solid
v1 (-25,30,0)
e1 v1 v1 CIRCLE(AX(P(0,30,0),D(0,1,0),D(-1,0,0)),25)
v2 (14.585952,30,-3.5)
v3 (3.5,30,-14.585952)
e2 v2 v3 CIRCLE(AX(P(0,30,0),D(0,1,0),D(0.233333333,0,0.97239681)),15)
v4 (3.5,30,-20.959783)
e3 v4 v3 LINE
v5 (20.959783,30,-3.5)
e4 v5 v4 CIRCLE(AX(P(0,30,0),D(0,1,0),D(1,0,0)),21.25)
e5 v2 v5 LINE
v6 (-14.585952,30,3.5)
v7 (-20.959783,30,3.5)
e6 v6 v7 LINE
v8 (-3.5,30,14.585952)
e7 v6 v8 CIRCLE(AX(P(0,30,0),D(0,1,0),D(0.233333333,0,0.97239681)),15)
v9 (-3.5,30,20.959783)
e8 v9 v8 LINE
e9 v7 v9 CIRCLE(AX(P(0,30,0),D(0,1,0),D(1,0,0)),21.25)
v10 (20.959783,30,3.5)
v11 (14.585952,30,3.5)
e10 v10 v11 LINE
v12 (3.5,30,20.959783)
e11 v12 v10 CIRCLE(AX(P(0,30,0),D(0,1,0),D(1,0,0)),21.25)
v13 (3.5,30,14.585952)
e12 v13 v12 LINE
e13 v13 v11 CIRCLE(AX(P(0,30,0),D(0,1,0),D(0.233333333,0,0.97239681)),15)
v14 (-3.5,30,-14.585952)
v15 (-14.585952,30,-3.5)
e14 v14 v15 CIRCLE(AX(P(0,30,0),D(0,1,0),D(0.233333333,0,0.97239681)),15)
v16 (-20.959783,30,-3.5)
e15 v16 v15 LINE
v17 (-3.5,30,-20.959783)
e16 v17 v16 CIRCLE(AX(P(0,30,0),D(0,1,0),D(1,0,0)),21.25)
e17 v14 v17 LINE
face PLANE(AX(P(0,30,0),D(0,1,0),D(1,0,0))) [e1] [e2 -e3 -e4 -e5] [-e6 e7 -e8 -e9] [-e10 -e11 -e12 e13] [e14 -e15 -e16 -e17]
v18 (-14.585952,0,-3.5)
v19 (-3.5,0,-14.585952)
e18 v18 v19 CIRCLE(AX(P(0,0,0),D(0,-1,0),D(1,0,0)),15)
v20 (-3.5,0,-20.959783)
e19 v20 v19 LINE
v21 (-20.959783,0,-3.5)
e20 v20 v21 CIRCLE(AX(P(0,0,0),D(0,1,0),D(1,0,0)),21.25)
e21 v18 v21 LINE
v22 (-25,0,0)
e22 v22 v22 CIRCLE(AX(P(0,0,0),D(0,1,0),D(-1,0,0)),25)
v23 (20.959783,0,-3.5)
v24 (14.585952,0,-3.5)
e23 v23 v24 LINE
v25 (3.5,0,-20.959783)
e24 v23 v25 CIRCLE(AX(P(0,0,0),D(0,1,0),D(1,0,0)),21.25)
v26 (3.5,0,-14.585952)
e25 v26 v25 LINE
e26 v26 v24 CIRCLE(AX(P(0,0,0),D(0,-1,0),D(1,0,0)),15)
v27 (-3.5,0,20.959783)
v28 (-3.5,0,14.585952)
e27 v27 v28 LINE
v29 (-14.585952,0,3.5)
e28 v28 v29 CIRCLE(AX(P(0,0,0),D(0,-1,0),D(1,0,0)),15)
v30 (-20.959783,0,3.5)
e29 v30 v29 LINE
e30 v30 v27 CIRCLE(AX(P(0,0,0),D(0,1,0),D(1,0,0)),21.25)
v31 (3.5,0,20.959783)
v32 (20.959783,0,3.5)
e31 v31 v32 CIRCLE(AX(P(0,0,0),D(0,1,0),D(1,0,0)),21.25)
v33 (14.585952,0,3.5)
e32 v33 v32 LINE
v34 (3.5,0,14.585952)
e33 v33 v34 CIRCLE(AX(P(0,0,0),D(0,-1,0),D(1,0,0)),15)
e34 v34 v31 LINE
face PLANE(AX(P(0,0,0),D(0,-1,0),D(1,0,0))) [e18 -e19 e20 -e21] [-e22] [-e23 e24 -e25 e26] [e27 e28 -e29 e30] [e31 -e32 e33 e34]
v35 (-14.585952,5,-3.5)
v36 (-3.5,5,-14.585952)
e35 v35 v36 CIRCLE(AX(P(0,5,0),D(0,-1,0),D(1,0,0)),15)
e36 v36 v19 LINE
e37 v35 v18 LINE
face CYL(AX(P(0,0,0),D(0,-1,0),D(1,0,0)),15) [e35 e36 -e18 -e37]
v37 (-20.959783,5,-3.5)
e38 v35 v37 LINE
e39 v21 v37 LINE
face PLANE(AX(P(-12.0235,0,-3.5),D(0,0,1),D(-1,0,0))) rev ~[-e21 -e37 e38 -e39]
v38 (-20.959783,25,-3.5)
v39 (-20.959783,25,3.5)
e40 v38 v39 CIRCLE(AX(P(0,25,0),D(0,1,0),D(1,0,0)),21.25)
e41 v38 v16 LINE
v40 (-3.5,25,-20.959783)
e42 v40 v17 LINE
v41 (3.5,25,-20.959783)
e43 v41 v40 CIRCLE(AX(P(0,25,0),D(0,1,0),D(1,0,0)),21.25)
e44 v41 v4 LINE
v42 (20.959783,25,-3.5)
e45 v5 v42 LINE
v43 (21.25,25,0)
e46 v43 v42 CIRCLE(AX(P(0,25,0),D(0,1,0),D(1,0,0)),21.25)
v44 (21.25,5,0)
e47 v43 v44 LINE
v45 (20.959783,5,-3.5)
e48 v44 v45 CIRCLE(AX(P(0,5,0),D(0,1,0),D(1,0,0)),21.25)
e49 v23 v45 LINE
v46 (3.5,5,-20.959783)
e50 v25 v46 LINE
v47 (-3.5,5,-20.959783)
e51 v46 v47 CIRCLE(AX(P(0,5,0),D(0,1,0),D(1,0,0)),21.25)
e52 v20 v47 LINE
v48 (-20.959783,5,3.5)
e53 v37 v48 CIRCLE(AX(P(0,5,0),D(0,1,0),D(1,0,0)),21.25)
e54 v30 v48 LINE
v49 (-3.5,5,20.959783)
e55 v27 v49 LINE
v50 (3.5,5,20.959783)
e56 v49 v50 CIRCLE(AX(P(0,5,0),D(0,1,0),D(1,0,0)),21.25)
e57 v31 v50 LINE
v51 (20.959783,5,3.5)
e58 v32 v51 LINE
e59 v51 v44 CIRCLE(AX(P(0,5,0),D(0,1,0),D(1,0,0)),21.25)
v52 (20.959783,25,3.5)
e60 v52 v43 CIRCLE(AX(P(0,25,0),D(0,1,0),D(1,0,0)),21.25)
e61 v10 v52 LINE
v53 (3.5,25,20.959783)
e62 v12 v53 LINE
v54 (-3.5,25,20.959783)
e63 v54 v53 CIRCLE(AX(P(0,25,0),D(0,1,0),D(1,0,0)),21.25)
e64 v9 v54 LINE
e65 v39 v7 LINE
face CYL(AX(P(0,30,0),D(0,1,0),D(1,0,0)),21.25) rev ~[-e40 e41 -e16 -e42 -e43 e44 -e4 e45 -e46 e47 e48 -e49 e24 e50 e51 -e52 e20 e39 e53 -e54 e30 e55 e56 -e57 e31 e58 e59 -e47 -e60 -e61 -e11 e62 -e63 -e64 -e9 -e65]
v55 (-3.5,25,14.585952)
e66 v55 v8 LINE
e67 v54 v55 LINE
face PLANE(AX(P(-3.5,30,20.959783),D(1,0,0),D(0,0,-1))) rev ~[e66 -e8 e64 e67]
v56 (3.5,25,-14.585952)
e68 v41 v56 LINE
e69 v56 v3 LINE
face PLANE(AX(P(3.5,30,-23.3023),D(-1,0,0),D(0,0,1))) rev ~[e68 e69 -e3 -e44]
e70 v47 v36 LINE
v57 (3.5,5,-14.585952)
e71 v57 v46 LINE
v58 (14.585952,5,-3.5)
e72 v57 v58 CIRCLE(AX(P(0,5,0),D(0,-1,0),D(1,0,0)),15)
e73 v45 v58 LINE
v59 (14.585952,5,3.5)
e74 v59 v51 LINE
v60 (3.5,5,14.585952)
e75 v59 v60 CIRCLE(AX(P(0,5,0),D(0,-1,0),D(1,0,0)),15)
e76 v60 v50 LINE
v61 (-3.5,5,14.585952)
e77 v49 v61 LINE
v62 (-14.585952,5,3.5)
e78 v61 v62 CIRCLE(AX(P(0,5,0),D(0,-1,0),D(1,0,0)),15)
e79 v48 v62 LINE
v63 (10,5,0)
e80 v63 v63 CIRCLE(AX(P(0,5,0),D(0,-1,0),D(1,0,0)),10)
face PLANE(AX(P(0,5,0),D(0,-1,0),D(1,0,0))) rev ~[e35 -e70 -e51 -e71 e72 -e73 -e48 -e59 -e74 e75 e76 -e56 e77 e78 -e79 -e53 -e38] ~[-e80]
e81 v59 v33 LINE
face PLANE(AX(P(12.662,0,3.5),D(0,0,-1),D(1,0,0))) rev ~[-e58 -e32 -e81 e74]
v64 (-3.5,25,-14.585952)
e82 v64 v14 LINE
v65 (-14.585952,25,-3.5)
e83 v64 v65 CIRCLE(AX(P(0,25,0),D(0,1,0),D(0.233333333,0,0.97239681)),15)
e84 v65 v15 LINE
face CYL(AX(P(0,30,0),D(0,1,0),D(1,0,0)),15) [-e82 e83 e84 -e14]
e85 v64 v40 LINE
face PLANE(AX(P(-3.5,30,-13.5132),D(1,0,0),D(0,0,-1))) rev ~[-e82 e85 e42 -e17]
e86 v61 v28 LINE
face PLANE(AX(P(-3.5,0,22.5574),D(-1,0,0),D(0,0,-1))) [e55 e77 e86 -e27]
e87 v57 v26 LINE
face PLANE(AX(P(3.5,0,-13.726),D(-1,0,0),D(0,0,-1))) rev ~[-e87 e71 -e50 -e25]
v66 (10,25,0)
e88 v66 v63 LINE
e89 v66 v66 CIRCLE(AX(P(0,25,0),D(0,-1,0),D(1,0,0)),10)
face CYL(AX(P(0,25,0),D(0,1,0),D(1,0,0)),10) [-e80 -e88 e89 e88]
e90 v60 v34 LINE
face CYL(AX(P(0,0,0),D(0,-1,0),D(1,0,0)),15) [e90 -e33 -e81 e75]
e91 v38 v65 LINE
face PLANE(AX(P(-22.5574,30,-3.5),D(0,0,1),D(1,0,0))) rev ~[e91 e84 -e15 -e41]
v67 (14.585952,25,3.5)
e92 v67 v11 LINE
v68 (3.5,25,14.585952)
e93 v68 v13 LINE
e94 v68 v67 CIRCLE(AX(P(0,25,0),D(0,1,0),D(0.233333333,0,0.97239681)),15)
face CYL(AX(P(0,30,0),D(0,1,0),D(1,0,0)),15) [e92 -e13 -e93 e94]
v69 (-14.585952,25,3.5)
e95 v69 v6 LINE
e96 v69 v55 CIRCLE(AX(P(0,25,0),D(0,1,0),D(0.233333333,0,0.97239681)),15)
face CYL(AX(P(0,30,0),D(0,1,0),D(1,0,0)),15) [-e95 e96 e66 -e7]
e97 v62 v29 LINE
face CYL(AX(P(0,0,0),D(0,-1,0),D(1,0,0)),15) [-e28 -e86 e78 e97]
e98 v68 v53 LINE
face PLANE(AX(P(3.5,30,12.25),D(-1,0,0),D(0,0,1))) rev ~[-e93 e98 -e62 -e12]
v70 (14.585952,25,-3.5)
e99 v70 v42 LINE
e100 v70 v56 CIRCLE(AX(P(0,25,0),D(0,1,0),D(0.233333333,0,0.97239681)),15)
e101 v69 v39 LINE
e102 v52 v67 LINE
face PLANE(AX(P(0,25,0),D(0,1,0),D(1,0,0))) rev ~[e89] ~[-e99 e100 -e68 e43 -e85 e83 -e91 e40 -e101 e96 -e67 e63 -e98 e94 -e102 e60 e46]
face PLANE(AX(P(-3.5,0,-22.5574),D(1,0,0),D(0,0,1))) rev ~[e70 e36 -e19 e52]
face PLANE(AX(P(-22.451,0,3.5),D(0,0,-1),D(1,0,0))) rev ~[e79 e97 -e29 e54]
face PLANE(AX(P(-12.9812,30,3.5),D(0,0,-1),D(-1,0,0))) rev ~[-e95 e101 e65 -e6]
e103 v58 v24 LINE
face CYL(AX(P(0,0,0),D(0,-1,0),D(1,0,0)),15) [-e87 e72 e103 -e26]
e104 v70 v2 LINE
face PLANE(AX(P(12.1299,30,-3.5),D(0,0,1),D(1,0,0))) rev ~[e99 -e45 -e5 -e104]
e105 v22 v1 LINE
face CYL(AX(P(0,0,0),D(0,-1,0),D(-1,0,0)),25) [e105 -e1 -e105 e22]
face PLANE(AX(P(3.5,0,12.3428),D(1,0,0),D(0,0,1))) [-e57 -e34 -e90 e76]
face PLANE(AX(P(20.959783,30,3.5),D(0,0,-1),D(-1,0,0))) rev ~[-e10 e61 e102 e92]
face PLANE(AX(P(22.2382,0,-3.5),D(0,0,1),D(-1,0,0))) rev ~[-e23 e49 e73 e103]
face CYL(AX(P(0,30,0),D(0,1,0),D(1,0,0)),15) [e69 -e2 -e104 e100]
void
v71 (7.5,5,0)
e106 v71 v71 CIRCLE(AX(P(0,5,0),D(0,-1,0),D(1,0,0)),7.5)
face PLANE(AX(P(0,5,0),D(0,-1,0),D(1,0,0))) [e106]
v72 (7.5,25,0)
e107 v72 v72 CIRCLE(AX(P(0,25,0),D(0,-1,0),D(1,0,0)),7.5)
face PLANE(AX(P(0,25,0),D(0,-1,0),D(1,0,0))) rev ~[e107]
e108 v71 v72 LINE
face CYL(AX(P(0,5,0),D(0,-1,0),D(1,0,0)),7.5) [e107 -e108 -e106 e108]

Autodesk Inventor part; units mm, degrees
ref_plane "YZ Plane" through (0, 0, 0) normal (1, 0, 0) x (0, 1, 0)
ref_plane "XZ Plane" through (0, 0, 0) normal (0, 1, 0) x (-1, 0, 0)
ref_plane "XY Plane" through (0, 0, 0) normal (0, 0, 1) x (1, 0, 0)
sketch "Sketch1" plane through (0, 0, 0) normal (0, 1, 0) x (-1, 0, 0)
  circle A0 centre (0, 0) radius 25
  dimension "d0" = 50
extrude "Extrusion1" add sketch "Sketch1" along normal blind 30
sketch "Sketch2" plane through (0, 30, 0) normal (0, 1, 0) x (1, 0, 0)
  circle A0 centre (0, 0) radius 21.25
  dimension "d3" = 42.5
extrude "Extrusion2" cut sketch "Sketch2" against normal blind 30
sketch "Sketch3" plane through (0, 30, 0) normal (0, 1, 0) x (1, 0, 0)
  circle A0 centre (0, 0) radius 15
  dimension "d6" = 30
extrude "Extrusion3" add sketch "Sketch3" against normal blind 5
sketch "Sketch4" plane through (0, 30, 0) normal (0, 1, 0) x (1, 0, 0)
  circle A0 centre (0, 0) radius 21.25 projected
  line L0 (0, -12.25) -> (3.5, -12.25)
  line L1 (3.5, -12.25) -> (3.5, -22.5574)
  line L2 (3.5, -22.5574) -> (-3.5, -22.5574)
  line L3 (-3.5, -22.5574) -> (-3.5, -12.25)
  line L4 (-3.5, -12.25) -> (0, -12.25)
  point P0 (-3.5, -20.9598)
  point P1 (3.5, -20.9598)
  dimension "d10" = 3.5
  dimension "d11" = 7
extrude "Extrusion4" add sketch "Sketch4" against normal blind 5 contours L3 L4 L0 L1 A0 picked at (1.5571, -15.2392)
sketch "Sketch5" plane through (0, 30, 0) normal (0, 1, 0) x (1, 0, 0)
  circle A0 centre (0, 0) radius 21.25 projected
  line L0 (12.1299, 0) -> (12.1299, 3.5)
  line L1 (12.1299, 3.5) -> (23.3023, 3.5)
  line L2 (23.3023, 3.5) -> (23.3023, -3.5)
  line L3 (23.3023, -3.5) -> (12.1299, -3.5)
  line L4 (12.1299, -3.5) -> (12.1299, 3.5)
  point P0 (20.9598, -3.5)
  point P1 (20.9598, 3.5)
  dimension "d16" = 3.5
  dimension "d17" = 7
extrude "Extrusion5" add sketch "Sketch5" against normal blind 5 contours A0 L3 L4 L0 L1 picked at (15.1269, -1.9464)
sketch "Sketch6" plane through (0, 30, 0) normal (0, 1, 0) x (1, 0, 0)
  line L0 (0, 13.5132) -> (-3.5, 13.5132)
  line L1 (-3.5, 13.5132) -> (-3.5, 23.3023)
  line L2 (-3.5, 23.3023) -> (3.5, 23.3023)
  line L3 (3.5, 23.3023) -> (3.5, 13.5132)
  line L4 (3.5, 13.5132) -> (-3.5, 13.5132)
  point P0 (0, 0)
  dimension "d20" = 7
extrude "Extrusion6" add sketch "Sketch6" against normal blind 5
sketch "Sketch7" plane through (0, 30, 0) normal (0, 1, 0) x (1, 0, 0)
  line L0 (-12.9812, 0) -> (-12.9812, -3.5)
  line L1 (-12.9812, -3.5) -> (-22.5574, -3.5)
  line L2 (-22.5574, -3.5) -> (-22.5574, 3.5)
  line L3 (-22.5574, 3.5) -> (-12.9812, 3.5)
  line L4 (-12.9812, 3.5) -> (-12.9812, 0)
  point P0 (0, 0)
  dimension "d23" = 3.5
  dimension "d24" = 7
extrude "Extrusion7" add sketch "Sketch7" against normal blind 5
sketch "Sketch8" plane through (0, 25, 0) normal (0, -1, 0) x (1, 0, 0)
  circle A0 centre (0, 0) radius 10
  dimension "d27" = 20
extrude "Extrusion8" add sketch "Sketch8" along normal blind 20
sketch "Sketch9" plane through (0, 5, 0) normal (0, -1, 0) x (1, 0, 0)
  circle A0 centre (0, 0) radius 7.5
  dimension "d30" = 15
extrude "Extrusion9" cut sketch "Sketch9" against normal blind 20
sketch "Sketch10" plane through (0, 0, 0) normal (0, -1, 0) x (1, 0, 0)
  circle A0 centre (0, 0) radius 15
extrude "Extrusion10" add sketch "Sketch10" against normal blind 5
sketch "Sketch11" plane through (0, 0, 0) normal (0, -1, 0) x (1, 0, 0)
  line L0 (12.662, 0) -> (12.662, 3.5)
  line L1 (12.662, 3.5) -> (22.2382, 3.5)
  line L2 (22.2382, 3.5) -> (22.2382, -3.5)
  line L3 (22.2382, -3.5) -> (12.662, -3.5)
  line L4 (12.662, -3.5) -> (12.662, 0)
  point P0 (0, 0)
  dimension "d35" = 3.5
  dimension "d36" = 7
extrude "Extrusion11" add sketch "Sketch11" against normal blind 5
sketch "Sketch12" plane through (0, 0, 0) normal (0, -1, 0) x (1, 0, 0)
  line L0 (0, 12.3428) -> (3.5, 12.3428)
  line L1 (3.5, 12.3428) -> (3.5, 22.5574)
  line L2 (3.5, 22.5574) -> (-3.5, 22.5574)
  line L3 (-3.5, 22.5574) -> (-3.5, 12.3428)
  line L4 (-3.5, 12.3428) -> (0, 12.3428)
  point P0 (0, 0)
  dimension "d39" = 3.5
  dimension "d40" = 7
extrude "Extrusion12" add sketch "Sketch12" against normal blind 5
sketch "Sketch13" plane through (0, 0, 0) normal (0, -1, 0) x (1, 0, 0)
  line L0 (0, -13.726) -> (3.5, -13.726)
  line L1 (3.5, -13.726) -> (3.5, -22.5574)
  line L2 (3.5, -22.5574) -> (-3.5, -22.5574)
  line L3 (-3.5, -22.5574) -> (-3.5, -13.726)
  line L4 (-3.5, -13.726) -> (0, -13.726)
  point P0 (0, 0)
  dimension "d43" = 3.5
  dimension "d44" = 7
extrude "Extrusion13" add sketch "Sketch13" against normal blind 5
sketch "Sketch14" plane through (0, 0, 0) normal (0, -1, 0) x (1, 0, 0)
  line L0 (-12.0235, 0) -> (-12.0235, -3.5)
  line L1 (-12.0235, -3.5) -> (-22.451, -3.5)
  line L2 (-22.451, -3.5) -> (-22.451, 3.5)
  line L3 (-22.451, 3.5) -> (-12.0235, 3.5)
  line L4 (-12.0235, 3.5) -> (-12.0235, 0)
  point P0 (0, 0)
  dimension "d47" = 3.5
  dimension "d48" = 7
extrude "Extrusion14" add sketch "Sketch14" against normal blind 5
properties part number "Wheel"
